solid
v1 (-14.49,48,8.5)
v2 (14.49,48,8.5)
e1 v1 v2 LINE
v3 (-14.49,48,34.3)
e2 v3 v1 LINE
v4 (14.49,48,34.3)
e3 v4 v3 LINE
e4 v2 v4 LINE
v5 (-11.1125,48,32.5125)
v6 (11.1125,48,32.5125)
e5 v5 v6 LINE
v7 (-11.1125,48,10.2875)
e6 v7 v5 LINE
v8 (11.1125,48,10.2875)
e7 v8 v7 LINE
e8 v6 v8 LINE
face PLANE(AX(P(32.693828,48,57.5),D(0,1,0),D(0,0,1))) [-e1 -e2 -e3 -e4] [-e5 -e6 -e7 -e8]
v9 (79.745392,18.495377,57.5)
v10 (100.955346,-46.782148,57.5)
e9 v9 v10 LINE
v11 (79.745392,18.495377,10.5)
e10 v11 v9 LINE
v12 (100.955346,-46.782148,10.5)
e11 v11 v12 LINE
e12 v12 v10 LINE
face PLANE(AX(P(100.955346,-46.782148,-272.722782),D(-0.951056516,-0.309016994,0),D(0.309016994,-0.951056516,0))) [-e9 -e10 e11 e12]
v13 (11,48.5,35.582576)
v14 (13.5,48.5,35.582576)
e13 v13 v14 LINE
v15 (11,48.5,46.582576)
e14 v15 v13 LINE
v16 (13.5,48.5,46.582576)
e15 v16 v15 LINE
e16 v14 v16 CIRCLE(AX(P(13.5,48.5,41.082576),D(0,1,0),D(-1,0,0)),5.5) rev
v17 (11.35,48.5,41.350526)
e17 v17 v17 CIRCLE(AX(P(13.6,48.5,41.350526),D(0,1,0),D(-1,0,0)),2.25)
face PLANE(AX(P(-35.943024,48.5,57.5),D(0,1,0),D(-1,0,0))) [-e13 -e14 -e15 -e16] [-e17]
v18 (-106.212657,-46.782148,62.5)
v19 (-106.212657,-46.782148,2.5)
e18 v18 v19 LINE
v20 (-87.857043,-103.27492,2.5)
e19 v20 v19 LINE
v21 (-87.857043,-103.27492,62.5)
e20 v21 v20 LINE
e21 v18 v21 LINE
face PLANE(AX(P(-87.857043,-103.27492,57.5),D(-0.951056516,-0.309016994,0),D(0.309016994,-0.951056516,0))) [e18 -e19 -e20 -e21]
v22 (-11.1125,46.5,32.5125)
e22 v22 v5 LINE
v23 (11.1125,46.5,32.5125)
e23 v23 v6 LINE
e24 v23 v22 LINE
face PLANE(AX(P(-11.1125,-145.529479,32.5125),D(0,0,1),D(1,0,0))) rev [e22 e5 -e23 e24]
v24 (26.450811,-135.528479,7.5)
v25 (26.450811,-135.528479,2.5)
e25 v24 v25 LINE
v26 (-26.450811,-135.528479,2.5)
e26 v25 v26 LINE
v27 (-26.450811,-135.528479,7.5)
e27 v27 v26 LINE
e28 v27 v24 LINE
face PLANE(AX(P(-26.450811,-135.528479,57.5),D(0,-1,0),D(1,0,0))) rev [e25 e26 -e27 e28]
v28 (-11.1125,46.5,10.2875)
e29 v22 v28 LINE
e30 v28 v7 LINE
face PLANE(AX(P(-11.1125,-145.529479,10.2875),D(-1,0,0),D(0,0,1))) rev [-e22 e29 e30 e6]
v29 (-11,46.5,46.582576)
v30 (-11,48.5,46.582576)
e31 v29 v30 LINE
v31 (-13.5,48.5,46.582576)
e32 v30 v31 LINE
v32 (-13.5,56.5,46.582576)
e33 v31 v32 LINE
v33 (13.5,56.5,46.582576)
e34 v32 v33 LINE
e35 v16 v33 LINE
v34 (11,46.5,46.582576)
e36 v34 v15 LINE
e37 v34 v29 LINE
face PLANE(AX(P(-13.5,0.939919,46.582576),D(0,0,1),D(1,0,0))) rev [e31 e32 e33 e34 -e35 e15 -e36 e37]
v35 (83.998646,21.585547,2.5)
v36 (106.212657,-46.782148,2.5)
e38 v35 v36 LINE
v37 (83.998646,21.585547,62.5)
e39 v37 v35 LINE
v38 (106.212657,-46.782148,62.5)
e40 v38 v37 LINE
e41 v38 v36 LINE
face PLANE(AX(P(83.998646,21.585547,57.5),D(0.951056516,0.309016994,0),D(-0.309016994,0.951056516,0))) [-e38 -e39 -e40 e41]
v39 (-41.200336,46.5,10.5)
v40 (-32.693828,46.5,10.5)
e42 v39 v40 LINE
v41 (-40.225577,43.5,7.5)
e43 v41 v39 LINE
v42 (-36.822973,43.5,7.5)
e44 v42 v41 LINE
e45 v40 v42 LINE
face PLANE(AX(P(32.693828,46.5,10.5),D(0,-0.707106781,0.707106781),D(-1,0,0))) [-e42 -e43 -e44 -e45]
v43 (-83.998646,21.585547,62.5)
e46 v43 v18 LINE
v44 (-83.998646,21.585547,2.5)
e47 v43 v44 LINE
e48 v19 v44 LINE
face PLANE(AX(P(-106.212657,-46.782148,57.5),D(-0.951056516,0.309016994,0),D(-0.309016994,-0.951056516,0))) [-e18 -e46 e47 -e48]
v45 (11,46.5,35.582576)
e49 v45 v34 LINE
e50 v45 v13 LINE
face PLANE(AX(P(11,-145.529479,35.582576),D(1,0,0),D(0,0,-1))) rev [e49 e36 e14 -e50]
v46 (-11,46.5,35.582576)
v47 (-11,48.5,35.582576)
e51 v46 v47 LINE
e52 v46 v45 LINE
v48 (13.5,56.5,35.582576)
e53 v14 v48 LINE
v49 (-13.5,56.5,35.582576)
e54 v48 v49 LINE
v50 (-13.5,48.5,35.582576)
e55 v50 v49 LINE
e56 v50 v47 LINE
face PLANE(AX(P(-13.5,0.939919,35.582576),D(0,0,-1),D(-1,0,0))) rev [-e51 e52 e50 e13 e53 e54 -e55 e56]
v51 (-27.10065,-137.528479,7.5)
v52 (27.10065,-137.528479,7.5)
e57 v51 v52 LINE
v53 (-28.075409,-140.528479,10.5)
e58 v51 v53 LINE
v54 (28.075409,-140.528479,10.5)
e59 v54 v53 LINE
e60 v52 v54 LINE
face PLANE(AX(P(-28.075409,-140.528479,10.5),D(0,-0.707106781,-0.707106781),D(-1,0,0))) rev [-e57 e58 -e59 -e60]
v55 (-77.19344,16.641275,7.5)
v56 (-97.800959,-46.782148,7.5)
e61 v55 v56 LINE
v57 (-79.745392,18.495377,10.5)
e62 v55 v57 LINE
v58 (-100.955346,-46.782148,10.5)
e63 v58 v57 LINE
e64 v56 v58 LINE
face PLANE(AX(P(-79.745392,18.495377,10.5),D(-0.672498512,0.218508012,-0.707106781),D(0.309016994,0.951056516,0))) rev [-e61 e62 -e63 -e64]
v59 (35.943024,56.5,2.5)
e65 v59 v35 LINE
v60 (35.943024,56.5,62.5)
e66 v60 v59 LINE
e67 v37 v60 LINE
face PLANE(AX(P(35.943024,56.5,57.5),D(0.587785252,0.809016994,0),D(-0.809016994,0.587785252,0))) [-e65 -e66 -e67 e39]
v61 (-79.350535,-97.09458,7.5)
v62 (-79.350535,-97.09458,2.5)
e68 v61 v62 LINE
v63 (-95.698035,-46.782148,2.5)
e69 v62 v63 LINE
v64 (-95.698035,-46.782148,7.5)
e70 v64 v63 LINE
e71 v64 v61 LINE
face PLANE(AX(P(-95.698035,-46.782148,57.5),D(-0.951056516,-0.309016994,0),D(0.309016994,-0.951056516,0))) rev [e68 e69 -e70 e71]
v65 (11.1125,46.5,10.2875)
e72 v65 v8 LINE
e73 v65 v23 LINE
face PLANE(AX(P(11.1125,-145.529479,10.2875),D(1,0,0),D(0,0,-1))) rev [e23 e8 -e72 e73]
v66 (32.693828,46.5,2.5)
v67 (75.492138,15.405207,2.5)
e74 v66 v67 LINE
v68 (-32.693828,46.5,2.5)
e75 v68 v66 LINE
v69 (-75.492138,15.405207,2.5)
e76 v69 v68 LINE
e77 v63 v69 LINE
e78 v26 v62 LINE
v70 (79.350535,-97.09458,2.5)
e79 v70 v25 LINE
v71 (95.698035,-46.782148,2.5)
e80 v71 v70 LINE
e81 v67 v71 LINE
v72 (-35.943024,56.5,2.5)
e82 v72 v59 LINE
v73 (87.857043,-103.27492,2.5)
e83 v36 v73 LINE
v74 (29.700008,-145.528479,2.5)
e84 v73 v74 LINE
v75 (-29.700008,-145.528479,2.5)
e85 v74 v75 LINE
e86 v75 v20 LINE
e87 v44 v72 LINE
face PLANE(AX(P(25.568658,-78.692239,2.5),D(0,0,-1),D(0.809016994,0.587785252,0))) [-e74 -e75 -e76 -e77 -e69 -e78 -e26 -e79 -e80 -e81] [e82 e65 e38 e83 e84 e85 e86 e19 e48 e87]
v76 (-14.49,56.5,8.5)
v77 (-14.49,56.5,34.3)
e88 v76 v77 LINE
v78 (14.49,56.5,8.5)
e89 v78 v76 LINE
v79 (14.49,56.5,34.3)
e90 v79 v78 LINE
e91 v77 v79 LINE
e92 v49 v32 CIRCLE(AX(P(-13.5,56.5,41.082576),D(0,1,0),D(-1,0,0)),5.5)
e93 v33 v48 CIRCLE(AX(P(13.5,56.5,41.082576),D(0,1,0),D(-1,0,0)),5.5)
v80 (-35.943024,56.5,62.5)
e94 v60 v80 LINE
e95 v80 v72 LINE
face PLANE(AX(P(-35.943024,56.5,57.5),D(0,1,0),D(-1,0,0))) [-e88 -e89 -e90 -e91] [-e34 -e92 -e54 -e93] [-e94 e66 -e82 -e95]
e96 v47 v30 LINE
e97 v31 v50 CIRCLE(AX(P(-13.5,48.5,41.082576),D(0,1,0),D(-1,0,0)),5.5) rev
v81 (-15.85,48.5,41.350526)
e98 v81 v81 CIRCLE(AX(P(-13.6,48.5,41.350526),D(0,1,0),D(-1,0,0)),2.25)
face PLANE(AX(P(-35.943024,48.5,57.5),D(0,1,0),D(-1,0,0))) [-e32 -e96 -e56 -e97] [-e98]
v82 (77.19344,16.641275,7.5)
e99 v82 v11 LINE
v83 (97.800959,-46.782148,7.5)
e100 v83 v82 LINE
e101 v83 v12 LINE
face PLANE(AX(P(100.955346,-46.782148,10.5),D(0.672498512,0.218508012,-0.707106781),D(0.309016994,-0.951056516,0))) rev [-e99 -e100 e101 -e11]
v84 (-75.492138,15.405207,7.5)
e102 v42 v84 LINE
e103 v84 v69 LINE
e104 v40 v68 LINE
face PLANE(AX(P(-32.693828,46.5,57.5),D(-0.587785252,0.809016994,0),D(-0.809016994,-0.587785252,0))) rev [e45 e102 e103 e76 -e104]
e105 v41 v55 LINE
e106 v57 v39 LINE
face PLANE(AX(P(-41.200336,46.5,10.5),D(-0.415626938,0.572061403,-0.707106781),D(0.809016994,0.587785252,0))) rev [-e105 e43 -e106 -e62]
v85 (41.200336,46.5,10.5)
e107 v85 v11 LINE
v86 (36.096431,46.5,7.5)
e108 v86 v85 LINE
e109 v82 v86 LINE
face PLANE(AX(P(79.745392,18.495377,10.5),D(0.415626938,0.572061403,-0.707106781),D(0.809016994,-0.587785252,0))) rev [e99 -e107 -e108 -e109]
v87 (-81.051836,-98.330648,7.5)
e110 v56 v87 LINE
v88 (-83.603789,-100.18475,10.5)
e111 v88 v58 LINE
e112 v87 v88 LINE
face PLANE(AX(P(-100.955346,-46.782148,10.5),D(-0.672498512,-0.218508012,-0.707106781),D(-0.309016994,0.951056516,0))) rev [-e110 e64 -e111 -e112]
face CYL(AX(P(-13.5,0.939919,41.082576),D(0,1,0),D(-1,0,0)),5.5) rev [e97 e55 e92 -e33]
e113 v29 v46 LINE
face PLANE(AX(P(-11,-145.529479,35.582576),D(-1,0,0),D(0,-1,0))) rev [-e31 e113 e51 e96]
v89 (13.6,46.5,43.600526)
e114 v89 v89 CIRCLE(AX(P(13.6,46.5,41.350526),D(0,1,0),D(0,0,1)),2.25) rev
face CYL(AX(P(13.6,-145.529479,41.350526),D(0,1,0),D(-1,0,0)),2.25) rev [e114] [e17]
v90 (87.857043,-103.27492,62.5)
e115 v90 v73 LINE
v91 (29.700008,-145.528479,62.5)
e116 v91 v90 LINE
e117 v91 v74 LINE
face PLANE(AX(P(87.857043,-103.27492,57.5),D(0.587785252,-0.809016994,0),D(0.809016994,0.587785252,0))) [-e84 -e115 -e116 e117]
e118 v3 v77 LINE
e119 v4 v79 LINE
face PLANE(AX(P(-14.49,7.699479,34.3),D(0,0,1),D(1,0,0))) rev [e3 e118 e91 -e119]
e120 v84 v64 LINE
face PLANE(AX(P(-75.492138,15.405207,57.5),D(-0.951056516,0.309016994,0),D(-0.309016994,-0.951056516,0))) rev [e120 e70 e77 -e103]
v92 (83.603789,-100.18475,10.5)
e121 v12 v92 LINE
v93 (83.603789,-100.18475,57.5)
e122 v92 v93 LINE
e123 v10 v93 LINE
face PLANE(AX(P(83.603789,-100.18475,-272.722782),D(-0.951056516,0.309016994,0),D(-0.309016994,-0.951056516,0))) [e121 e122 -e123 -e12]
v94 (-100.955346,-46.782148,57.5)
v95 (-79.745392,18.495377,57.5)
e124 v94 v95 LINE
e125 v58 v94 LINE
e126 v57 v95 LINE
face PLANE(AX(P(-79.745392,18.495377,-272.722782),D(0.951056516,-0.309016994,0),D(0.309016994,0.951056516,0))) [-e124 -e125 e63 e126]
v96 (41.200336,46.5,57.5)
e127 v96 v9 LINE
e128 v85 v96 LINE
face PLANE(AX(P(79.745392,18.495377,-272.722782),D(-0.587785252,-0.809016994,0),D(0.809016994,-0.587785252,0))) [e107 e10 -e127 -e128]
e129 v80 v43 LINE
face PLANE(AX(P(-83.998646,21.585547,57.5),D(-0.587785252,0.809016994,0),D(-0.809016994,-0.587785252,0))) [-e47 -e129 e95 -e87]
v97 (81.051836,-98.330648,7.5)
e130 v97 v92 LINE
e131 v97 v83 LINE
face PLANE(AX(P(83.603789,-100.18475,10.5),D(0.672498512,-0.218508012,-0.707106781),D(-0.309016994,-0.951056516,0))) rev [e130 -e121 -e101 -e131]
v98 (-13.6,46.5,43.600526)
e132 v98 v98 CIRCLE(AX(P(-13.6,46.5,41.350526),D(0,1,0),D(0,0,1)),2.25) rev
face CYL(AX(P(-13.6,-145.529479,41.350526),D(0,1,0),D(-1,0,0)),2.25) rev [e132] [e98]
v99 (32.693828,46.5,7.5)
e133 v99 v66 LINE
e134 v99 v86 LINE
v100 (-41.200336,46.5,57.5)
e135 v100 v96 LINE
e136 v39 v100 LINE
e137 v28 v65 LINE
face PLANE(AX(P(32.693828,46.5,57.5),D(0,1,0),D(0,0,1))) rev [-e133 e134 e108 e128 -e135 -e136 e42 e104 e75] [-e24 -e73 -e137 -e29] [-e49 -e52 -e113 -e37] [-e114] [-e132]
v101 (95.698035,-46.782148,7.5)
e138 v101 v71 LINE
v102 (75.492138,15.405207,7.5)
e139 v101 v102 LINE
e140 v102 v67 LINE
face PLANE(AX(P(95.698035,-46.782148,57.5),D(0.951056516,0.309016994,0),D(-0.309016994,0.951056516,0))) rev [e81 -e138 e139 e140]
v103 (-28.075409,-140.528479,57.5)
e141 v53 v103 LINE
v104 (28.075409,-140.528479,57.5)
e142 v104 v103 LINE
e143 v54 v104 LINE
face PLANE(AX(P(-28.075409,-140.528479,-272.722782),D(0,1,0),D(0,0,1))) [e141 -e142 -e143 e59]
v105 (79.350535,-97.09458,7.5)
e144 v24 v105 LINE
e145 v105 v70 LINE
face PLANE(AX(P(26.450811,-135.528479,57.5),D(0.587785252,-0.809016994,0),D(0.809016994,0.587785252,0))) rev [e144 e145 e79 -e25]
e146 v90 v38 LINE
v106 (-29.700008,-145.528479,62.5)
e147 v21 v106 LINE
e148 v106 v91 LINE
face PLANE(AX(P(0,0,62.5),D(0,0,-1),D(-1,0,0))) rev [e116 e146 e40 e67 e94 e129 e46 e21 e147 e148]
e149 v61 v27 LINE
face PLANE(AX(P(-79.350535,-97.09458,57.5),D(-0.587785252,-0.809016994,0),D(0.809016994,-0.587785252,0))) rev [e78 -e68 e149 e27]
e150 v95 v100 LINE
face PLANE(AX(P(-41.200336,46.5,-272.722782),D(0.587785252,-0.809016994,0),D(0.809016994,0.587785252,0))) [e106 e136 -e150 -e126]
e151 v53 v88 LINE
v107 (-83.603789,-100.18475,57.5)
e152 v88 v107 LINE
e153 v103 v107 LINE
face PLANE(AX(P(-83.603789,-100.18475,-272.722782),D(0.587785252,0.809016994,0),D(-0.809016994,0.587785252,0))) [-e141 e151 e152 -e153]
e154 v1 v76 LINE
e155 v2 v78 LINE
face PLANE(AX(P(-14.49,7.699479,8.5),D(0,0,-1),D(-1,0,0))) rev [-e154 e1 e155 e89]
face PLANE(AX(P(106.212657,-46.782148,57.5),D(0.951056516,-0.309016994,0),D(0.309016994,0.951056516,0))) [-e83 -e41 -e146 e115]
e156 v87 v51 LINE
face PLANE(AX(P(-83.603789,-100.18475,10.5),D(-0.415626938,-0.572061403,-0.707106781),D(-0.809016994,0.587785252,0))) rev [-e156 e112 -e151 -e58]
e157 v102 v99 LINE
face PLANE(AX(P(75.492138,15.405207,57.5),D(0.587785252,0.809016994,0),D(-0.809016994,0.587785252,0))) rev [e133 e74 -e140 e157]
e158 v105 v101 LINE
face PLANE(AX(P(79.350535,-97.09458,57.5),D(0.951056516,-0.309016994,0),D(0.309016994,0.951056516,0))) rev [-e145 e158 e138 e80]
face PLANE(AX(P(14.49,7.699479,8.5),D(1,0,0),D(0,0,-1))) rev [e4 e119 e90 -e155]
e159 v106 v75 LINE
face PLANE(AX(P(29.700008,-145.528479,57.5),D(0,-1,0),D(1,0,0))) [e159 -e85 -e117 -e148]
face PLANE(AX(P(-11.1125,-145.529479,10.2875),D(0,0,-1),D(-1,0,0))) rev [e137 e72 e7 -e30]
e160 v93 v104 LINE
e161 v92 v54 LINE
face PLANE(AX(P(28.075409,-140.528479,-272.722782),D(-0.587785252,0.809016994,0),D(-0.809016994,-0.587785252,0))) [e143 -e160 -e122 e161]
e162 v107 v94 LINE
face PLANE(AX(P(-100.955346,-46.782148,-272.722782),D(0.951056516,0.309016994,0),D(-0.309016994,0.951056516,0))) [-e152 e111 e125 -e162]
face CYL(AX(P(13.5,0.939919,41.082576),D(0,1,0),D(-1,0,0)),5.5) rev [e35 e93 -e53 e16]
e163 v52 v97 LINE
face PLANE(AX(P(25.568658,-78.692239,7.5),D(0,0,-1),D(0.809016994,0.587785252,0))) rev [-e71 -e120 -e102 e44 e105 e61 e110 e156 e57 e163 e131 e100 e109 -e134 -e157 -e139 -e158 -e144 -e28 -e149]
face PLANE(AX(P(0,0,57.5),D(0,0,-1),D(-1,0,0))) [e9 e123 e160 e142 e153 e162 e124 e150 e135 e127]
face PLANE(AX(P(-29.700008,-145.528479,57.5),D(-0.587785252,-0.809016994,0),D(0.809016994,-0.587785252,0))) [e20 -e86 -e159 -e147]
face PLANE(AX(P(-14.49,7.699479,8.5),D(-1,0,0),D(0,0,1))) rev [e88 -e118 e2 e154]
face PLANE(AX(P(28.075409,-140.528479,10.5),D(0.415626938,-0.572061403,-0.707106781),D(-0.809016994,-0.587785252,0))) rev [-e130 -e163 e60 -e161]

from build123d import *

# Parameters (mm, degrees)
BOSS_EXTRUDE1_DEPTH      = 32.5
SKETCH4_R                = 1.05
BOSS_EXTRUDE2_DEPTH      = 2.5
SKETCH5_R                = 1.05
BOSS_EXTRUDE3_DEPTH      = 3
CUT_EXTRUDE1_DEPTH       = 57.494113711
SKETCH13_W               = 30.122
SKETCH13_H               = 38
BOSS_EXTRUDE7_DEPTH      = 2.5
BOSS_EXTRUDE4_DEPTH      = 5
BOSS_EXTRUDE6_DEPTH      = 5
CUT_EXTRUDE2_DEPTH       = 88.339560135
SKETCH14_W               = 15
SKETCH14_H               = 5
CUT_EXTRUDE3_DEPTH       = 78.191649756
SKETCH15_W               = 30.122
SKETCH15_H               = 34.5
SKETCH15_R               = 2.495
BOSS_EXTRUDE8_DEPTH      = 3
SKETCH17_R               = 13.75
CUT_EXTRUDE4_DEPTH       = 82.57236537
CUT_EXTRUDE6_DEPTH       = 78.191649756
CUT_EXTRUDE6_DEPTH_BACK  = 78.191649756
SKETCH19_W               = 15
SKETCH19_H               = 3
SKETCH21_R               = 2.25
CUT_EXTRUDE8_DEPTH       = 1.5
SKETCH20_R               = 10
CUT_EXTRUDE7_DEPTH       = 80.23730682
CIRPATTERN2_COUNT        = 5
CHAMFER1_SIZE2           = 2
CHAMFER1_SIZE            = 1.154700538
SKETCH22_R               = 1.575
CUT_EXTRUDE9_DEPTH       = 170.45894052
SKETCH23_R               = 2.6
CUT_EXTRUDE10_DEPTH      = 3
CIRPATTERN3_COUNT        = 5
BOSS_EXTRUDE9_DEPTH      = 55
CUT_EXTRUDE11_DEPTH      = 187.975043137
CUT_EXTRUDE11_DEPTH_BACK = 187.975043137
BOSS_EXTRUDE10_DEPTH     = 5
CUT_EXTRUDE12_DEPTH      = 50
CHAMFER2_SIZE            = 3
SKETCH30_W               = 28.98
SKETCH30_H               = 25.8
CUT_EXTRUDE15_DEPTH      = 8.5
CUT_EXTRUDE16_REACH      = 231.436
SKETCH33_W               = 22.225
SKETCH33_H               = 22.225
CUT_EXTRUDE14_DEPTH      = 8
CUT_EXTRUDE17_REACH      = 231.857
SKETCH34_R               = 2.25
SKETCH34_W               = 22
SKETCH34_H               = 11


with BuildPart() as part:
    # Sketch2 → Boss-Extrude1 (new body)
    with BuildSketch(Plane(origin=(0, 0, 0), x_dir=(1, 0, 0), z_dir=(0, 1, 0))):
        Polygon((15.061, 0), (15.061, 32), (12.561, 32), (12.561, 2.5), (-12.561, 2.5), (-12.561, 32), (-15.061, 32), (-15.061, 0), align=None)
    extrude(amount=BOSS_EXTRUDE1_DEPTH)

    # Sketch4 → Boss-Extrude2 (add)
    # profile 1 of 2: a face of its own
    with BuildSketch(Plane.XZ):
        Polygon((-7.561, -6), (-7.561, 0), (-15.061, 0), (-15.061, -32), (-12.561, -32), (-12.561, -10), align=None)
        with Locations(Location((-10.2499, -4.95, 0), (0, 0, 270))):
            Circle(SKETCH4_R, mode=Mode.SUBTRACT)
    # profile 2 of 2: a face of its own
    with BuildSketch(Plane.XZ):
        Polygon((12.561, -10), (7.561, -6), (7.561, 0), (15.061, 0), (15.061, -32), (12.561, -32), align=None)
        with Locations(Location((10.2499, -4.95, 0), (0, 0, 270))):
            Circle(SKETCH4_R, mode=Mode.SUBTRACT)
    extrude(amount=BOSS_EXTRUDE2_DEPTH)

    # Sketch5 → Boss-Extrude3 (add)
    with BuildSketch(Plane(origin=(0, 32.5, 0), x_dir=(1, 0, 0), z_dir=(0, 1, 0))):
        Polygon((-15.061, 32), (-10.2499, 32), (-6.25, 26), (6.25, 26), (10.2499, 32), (15.061, 32), (15.061, 0), (-15.061, 0), align=None)
        with Locations(Location((-10.2499, 8.7, 0), (0, 0, 270))):
            Circle(SKETCH5_R, mode=Mode.SUBTRACT)
        with Locations(Location((10.2499, 8.7, 0), (0, 0, 270))):
            Circle(SKETCH5_R, mode=Mode.SUBTRACT)
    extrude(amount=BOSS_EXTRUDE3_DEPTH)

    # Sketch6 → Cut-Extrude1 (cut, through all)
    with BuildSketch(Plane.ZY.offset(15.061)):
        Polygon((-12.5, 35.5), (-32, 2.5), (-32, 35.5), align=None)
    extrude(amount=-CUT_EXTRUDE1_DEPTH, mode=Mode.SUBTRACT)

    # Sketch13 → Boss-Extrude7 (add)
    with BuildSketch(Plane.XY):
        with Locations((0, 16.5)):
            Rectangle(SKETCH13_W, SKETCH13_H)
    extrude(amount=BOSS_EXTRUDE7_DEPTH)

    # Sketch8 → Boss-Extrude4 (add)
    with BuildSketch(Plane.XY.offset(2.5)):
        Polygon((0, -43.5), (-43.59255168, 16.5), (43.59255168, 16.5), align=None)
    extrude(amount=BOSS_EXTRUDE4_DEPTH)

    # Sketch9 → Boss-Extrude6 (add)
    with BuildSketch(Plane.XY.offset(2.5)):
        Polygon((43.59255168, 16.5), (65.38882752, 46.5), (-65.38882752, 46.5), (-43.59255168, 16.5), align=None)
    extrude(amount=BOSS_EXTRUDE6_DEPTH)

    # Sketch10 → Cut-Extrude2 (cut, through all)
    with BuildSketch(Plane(origin=(0, 0, 2.5), x_dir=(-1, 0, 0), z_dir=(0, 0, -1))):
        Polygon((-65.38882752, 46.5), (-54.092982836, 30.9526036), (-32.69382752, 46.5), align=None)
        Polygon((54.092982836, 30.9526036), (65.38882752, 46.5), (32.69382752, 46.5), align=None)
    extrude(amount=-CUT_EXTRUDE2_DEPTH, mode=Mode.SUBTRACT)

    # Sketch14 → Cut-Extrude3 (cut, through all)
    with BuildSketch(Plane(origin=(0, 0, -2.5), x_dir=(-1, 0, 0), z_dir=(0, 0, -1))):
        Polygon((-7.561, -2.5), (7.561, -2.5), (7.561, 0), (12.561, 0), (12.561, 7.783674653), (-12.561, 7.783674653), (-12.561, 0), (-7.561, 0), align=None)
        with Locations((0, 38)):
            Rectangle(SKETCH14_W, SKETCH14_H)
    extrude(amount=-CUT_EXTRUDE3_DEPTH, mode=Mode.SUBTRACT)

    # Sketch15 → Boss-Extrude8 (add)
    with BuildSketch(Plane.XZ.offset(2.5)):
        with Locations((0, -14.75)):
            Rectangle(SKETCH15_W, SKETCH15_H)
        with Locations(Location((-10.2499, -4.95, 0), (0, 0, 270))):
            Circle(SKETCH15_R, mode=Mode.SUBTRACT)
        with Locations(Location((10.340989886, -4.95, 0), (0, 0, 270))):
            Circle(SKETCH15_R, mode=Mode.SUBTRACT)
    extrude(amount=BOSS_EXTRUDE8_DEPTH)

    # Sketch17 → Cut-Extrude4 (cut, through all)
    with BuildSketch(Plane.XZ.offset(5.5)):
        with Locations((0, -37.5)):
            Circle(SKETCH17_R)
    extrude(amount=-CUT_EXTRUDE4_DEPTH, mode=Mode.SUBTRACT)

    # Sketch19 → Cut-Extrude6 (cut, two sides: drawn at the far end of the back side and taken through both)
    with BuildSketch(Plane(origin=(0, 0, -2.5), x_dir=(-1, 0, 0), z_dir=(0, 0, -1)).offset(-CUT_EXTRUDE6_DEPTH_BACK)):
        with Locations((0, 34)):
            Rectangle(SKETCH19_W, SKETCH19_H)
    extrude(amount=CUT_EXTRUDE6_DEPTH + CUT_EXTRUDE6_DEPTH_BACK, mode=Mode.SUBTRACT)

    # Sketch21 → Cut-Extrude8 (cut)
    with BuildSketch(Plane(origin=(0, 35.5, 0), x_dir=(1, 0, 0), z_dir=(0, 1, 0))):
        with Locations(Location((-10.2499, 8.7, 0), (0, 0, 270))):
            Circle(SKETCH21_R)
        with Locations(Location((10.2499, 8.7, 0), (0, 0, 270))):
            Circle(SKETCH21_R)
    extrude(amount=-CUT_EXTRUDE8_DEPTH, mode=Mode.SUBTRACT)

    # Sketch20 → Cut-Extrude7 (cut, through all)
    with BuildSketch(Plane(origin=(0, 0, 2.5), x_dir=(-1, 0, 0), z_dir=(0, 0, -1))):
        with Locations((0, -43.5)):
            Circle(SKETCH20_R)
    extrude(amount=-CUT_EXTRUDE7_DEPTH, mode=Mode.SUBTRACT)


with BuildPart() as cirpattern2_1:
    # CirPattern2: pattern copy
    add(part.part.rotate(Axis((0, -43.5, 0), (0, 0, 1)), 1 * 360 / CIRPATTERN2_COUNT))


with BuildPart() as cirpattern2_2:
    # CirPattern2: pattern copy
    add(part.part.rotate(Axis((0, -43.5, 0), (0, 0, 1)), 2 * 360 / CIRPATTERN2_COUNT))


with BuildPart() as cirpattern2_3:
    # CirPattern2: pattern copy
    add(part.part.rotate(Axis((0, -43.5, 0), (0, 0, 1)), 3 * 360 / CIRPATTERN2_COUNT))


with BuildPart() as cirpattern2_4:
    # CirPattern2: pattern copy
    add(part.part.rotate(Axis((0, -43.5, 0), (0, 0, 1)), 4 * 360 / CIRPATTERN2_COUNT))


with BuildPart() as cirpattern2_3_1:
    add(cirpattern2_3.part)

    # Combine1: union CirPattern2_2, CirPattern2_1, part, CirPattern2_4
    add(cirpattern2_2.part)
    add(cirpattern2_1.part)
    add(part.part)
    add(cirpattern2_4.part)

    # Chamfer1
    chamfer1_edges = [cirpattern2_3_1.edges().sort_by_distance(p)[0] for p in [
        (52.900672706, -116.311529494, 7.5),
        (0, -135.528479151, 7.5),
        (87.524284782, -71.938364024, 7.5),
        (24.099195344, -76.669696769, 7.5),
        (18.716949415, -82.125212305, 7.5),
        (17.429138494, -84.605946679, 7.5),
        (17.694160593, -89.223972346, 7.5),
        (30.143787645, -84.989364329, 7.5),
        (38.018285526, -74.457631238, 7.5),
        (33.708178455, -72.778531832, 7.5),
        (30.950904404, -73.23672372, 7.5),
        (40.955192726, -112.629748942, 7.5),
        (49.373961193, -111.457427527, 7.5),
        (53.090447641, -103.812970158, 7.5),
        (44.671679174, -104.985291572, 7.5),
        (-5.877852523, -51.590169944, 7.5),
        (-52.900672706, -116.311529494, 7.5),
        (-33.708178455, -72.778531832, 7.5),
        (-30.950904404, -73.23672372, 7.5),
        (-24.099195344, -76.669696769, 7.5),
        (-18.716949415, -82.125212305, 7.5),
        (-17.429138494, -84.605946679, 7.5),
        (-17.694160593, -89.223972346, 7.5),
        (-30.143787645, -84.989364329, 7.5),
        (-38.018285526, -74.457631238, 7.5),
        (-44.671679174, -104.985291572, 7.5),
        (-40.955192726, -112.629748942, 7.5),
        (-49.373961193, -111.457427527, 7.5),
        (-53.090447641, -103.812970158, 7.5),
        (54.092982836, 30.9526036, 7.5),
        (-54.092982836, 30.9526036, 7.5),
        (-87.524284782, -71.938364024, 7.5),
        (-38.261938478, -20.489181134, 7.5),
        (-37.845660319, -23.253093668, 7.5),
        (-38.993317168, -30.830303231, 7.5),
        (-42.518615308, -37.634970307, 7.5),
        (-44.479978439, -39.626340355, 7.5),
        (-48.953878175, -40.801337773, 7.5),
        (-48.773672959, -27.652472998, 7.5),
        (-41.190753242, -16.90889597, 7.5),
        (-72.280295238, -20.014708428, 7.5),
        (-78.402148761, -25.911564322, 7.5),
        (-79.888747369, -17.542572473, 7.5),
        (-73.766893846, -11.645716578, 7.5),
        (10.061, 0, 7.5),
        (7.561, -1.25, 7.5),
        (0, -2.5, 7.5),
        (-7.561, -1.25, 7.5),
        (-10.061, 0, 7.5),
        (-12.561, 3.891837327, 7.5),
        (0, 7.783674653, 7.5),
        (12.561, 3.891837327, 7.5),
        (0, 32.5, 7.5),
        (-7.5, 36.5, 7.5),
        (0, 40.5, 7.5),
        (7.5, 36.5, 7.5),
        (44.479978439, -39.626340355, 7.5),
        (42.518615308, -37.634970307, 7.5),
        (38.993317168, -30.830303231, 7.5),
        (37.845660319, -23.253093668, 7.5),
        (38.261938478, -20.489181134, 7.5),
        (41.190753242, -16.90889597, 7.5),
        (48.773672959, -27.652472998, 7.5),
        (48.953878175, -40.801337773, 7.5),
        (72.280295238, -20.014708428, 7.5),
        (73.766893846, -11.645716578, 7.5),
        (79.888747369, -17.542572473, 7.5),
        (78.402148761, -25.911564322, 7.5),
        (-85.595086467, -15.688470506, 7.5),
        (0, 46.5, 7.5),
        (85.595086467, -15.688470506, 7.5),
    ]]
    chamfer(chamfer1_edges, length=CHAMFER1_SIZE, length2=CHAMFER1_SIZE2)

    # Sketch22 → Cut-Extrude9 (cut, through all)
    with BuildSketch(Plane(origin=(0, 0, 2.5), x_dir=(-1, 0, 0), z_dir=(0, 0, -1))):
        with Locations((0, -123.5)):
            Circle(SKETCH22_R)
    cut_extrude9 = extrude(amount=-CUT_EXTRUDE9_DEPTH, mode=Mode.SUBTRACT)

    # Sketch23 → Cut-Extrude10 (cut)
    with BuildSketch(Plane(origin=(0, 0, 2.5), x_dir=(-1, 0, 0), z_dir=(0, 0, -1))):
        with Locations((0, -123.5)):
            Circle(SKETCH23_R)
    cut_extrude10 = extrude(amount=-CUT_EXTRUDE10_DEPTH, mode=Mode.SUBTRACT)

    # CirPattern3: Cut-Extrude9, Cut-Extrude10 ×5 about axis
    cirpattern3_axis = Axis((0, -43.5, 0), (0, 0, 1))
    add([cut_extrude9.rotate(cirpattern3_axis, i * 360 / CIRPATTERN3_COUNT) for i in range(1, CIRPATTERN3_COUNT)], mode=Mode.SUBTRACT)
    add([cut_extrude10.rotate(cirpattern3_axis, i * 360 / CIRPATTERN3_COUNT) for i in range(1, CIRPATTERN3_COUNT)], mode=Mode.SUBTRACT)

    # Sketch24 → Boss-Extrude9 (add)
    with BuildSketch(Plane(origin=(0, 0, 2.5), x_dir=(-1, 0, 0), z_dir=(0, 0, -1))):
        Polygon((87.857042865, -103.274919724), (106.212657024, -46.782148212), (83.998646235, 21.585547087), (35.943024483, 56.5), (-35.943024483, 56.5), (-83.998646235, 21.585547087), (-106.212657024, -46.782148212), (-87.857042865, -103.274919724), (-29.700007593, -145.528479151), (29.700007593, -145.528479151), align=None)
        Polygon((-32.69382752, 46.5), (32.69382752, 46.5), (75.492138152, 15.4052072), (95.698034782, -46.782148212), (79.350534782, -97.094579836), (26.450810631, -135.528479151), (-26.450810631, -135.528479151), (-79.350534782, -97.094579836), (-95.698034782, -46.782148212), (-75.492138152, 15.4052072), align=None, mode=Mode.SUBTRACT)
    extrude(amount=-BOSS_EXTRUDE9_DEPTH)

    # Sketch25 → Cut-Extrude11 (cut, two sides: drawn at the far end of the back side and taken through both)
    with BuildSketch(Plane.XY.offset(7.5).offset(-CUT_EXTRUDE11_DEPTH_BACK)):
        Polygon((-32.69382752, 46.5), (32.69382752, 46.5), (75.492138152, 15.4052072), (95.698034782, -46.782148212), (79.350534782, -97.094579836), (26.450810631, -135.528479151), (-26.450810631, -135.528479151), (-79.350534782, -97.094579836), (-95.698034782, -46.782148212), (-75.492138152, 15.4052072), align=None)
    extrude(amount=CUT_EXTRUDE11_DEPTH + CUT_EXTRUDE11_DEPTH_BACK, mode=Mode.SUBTRACT)

    # Sketch26 → Boss-Extrude10 (add)
    with BuildSketch(Plane.XY.offset(57.5)):
        Polygon((-83.998646235, 21.585547087), (-35.943024483, 56.5), (35.943024483, 56.5), (83.998646235, 21.585547087), (106.212657024, -46.782148212), (87.857042865, -103.274919724), (29.700007593, -145.528479151), (-29.700007593, -145.528479151), (-87.857042865, -103.274919724), (-106.212657024, -46.782148212), align=None)
    extrude(amount=BOSS_EXTRUDE10_DEPTH)

    # Sketch29 → Cut-Extrude12 (cut)
    with BuildSketch(Plane(origin=(0, 0, 57.5), x_dir=(-1, 0, 0), z_dir=(0, 0, -1))):
        Polygon((-41.200335604, 46.5), (41.200335604, 46.5), (79.745392193, 18.495377143), (100.955345903, -46.782148212), (83.603788823, -100.18474978), (28.075409112, -140.528479151), (-28.075409112, -140.528479151), (-83.603788823, -100.18474978), (-100.955345903, -46.782148212), (-79.745392193, 18.495377143), align=None)
    extrude(amount=CUT_EXTRUDE12_DEPTH, mode=Mode.SUBTRACT)

    # Chamfer2
    chamfer2_edges = [cirpattern2_3_1.edges().sort_by_distance(p)[0] for p in [
        (-36.947081562, 46.5, 7.5),
        (60.472863899, 32.497688572, 7.5),
        (90.350369048, -14.143385534, 7.5),
        (92.279567363, -73.483448996, 7.5),
        (55.839598968, -120.356614466, 7.5),
        (0, -140.528479151, 7.5),
        (-55.839598968, -120.356614466, 7.5),
        (-92.279567363, -73.483448996, 7.5),
        (-90.350369048, -14.143385534, 7.5),
        (-60.472863899, 32.497688572, 7.5),
    ]]
    chamfer(chamfer2_edges, length=CHAMFER2_SIZE)

    # Sketch30 → Cut-Extrude15 (cut)
    with BuildSketch(Plane(origin=(0, 56.5, 0), x_dir=(1, 0, 0), z_dir=(0, 1, 0))):
        with Locations((0, -21.4)):
            Rectangle(SKETCH30_W, SKETCH30_H)
    extrude(amount=-CUT_EXTRUDE15_DEPTH, mode=Mode.SUBTRACT)

    # Sketch33 → Cut-Extrude16 (cut, up to next)
    with BuildSketch(Plane(origin=(0, 48, 0), x_dir=(1, 0, 0), z_dir=(0, 1, 0)), mode=Mode.PRIVATE) as cut_extrude16_sk1:
        with Locations((0, -21.4)):
            Rectangle(SKETCH33_W, SKETCH33_H)
    cut_extrude16_tool1 = extrude(cut_extrude16_sk1.sketch, amount=-CUT_EXTRUDE16_REACH, mode=Mode.PRIVATE) & cirpattern2_3_1.part
    add(cut_extrude16_tool1.solids().sort_by_distance((0, 48, 21.4))[0], mode=Mode.SUBTRACT)

    # Sketch32 → Cut-Extrude14 (cut)
    with BuildSketch(Plane(origin=(0, 56.5, 0), x_dir=(1, 0, 0), z_dir=(0, 1, 0))):
        with BuildLine():
            Line((-13.5, -35.582576287), (13.5, -35.582576287))
            ThreePointArc((13.5, -35.582576287), (19, -41.082576287), (13.5, -46.582576287))
            Line((13.5, -46.582576287), (-13.5, -46.582576287))
            ThreePointArc((-13.5, -46.582576287), (-19, -41.082576287), (-13.5, -35.582576287))
        make_face()
    extrude(amount=-CUT_EXTRUDE14_DEPTH, mode=Mode.SUBTRACT)

    # Sketch34 → Cut-Extrude17 (cut, up to next)
    with BuildSketch(Plane(origin=(0, 48.5, 0), x_dir=(1, 0, 0), z_dir=(0, 1, 0)), mode=Mode.PRIVATE) as cut_extrude17_sk1:
        with Locations(Location((-13.6, -41.350525767, 0), (0, 0, 180))):
            Circle(SKETCH34_R)
    cut_extrude17_tool1 = extrude(cut_extrude17_sk1.sketch, amount=-CUT_EXTRUDE17_REACH, mode=Mode.PRIVATE) & cirpattern2_3_1.part
    # Sketch34 → Cut-Extrude17 (cut, up to next)
    with BuildSketch(Plane(origin=(0, 48.5, 0), x_dir=(1, 0, 0), z_dir=(0, 1, 0)), mode=Mode.PRIVATE) as cut_extrude17_sk2:
        with Locations(Location((13.6, -41.350525767, 0), (0, 0, 180))):
            Circle(SKETCH34_R)
    cut_extrude17_tool2 = extrude(cut_extrude17_sk2.sketch, amount=-CUT_EXTRUDE17_REACH, mode=Mode.PRIVATE) & cirpattern2_3_1.part
    # Sketch34 → Cut-Extrude17 (cut, up to next)
    with BuildSketch(Plane(origin=(0, 48.5, 0), x_dir=(1, 0, 0), z_dir=(0, 1, 0)), mode=Mode.PRIVATE) as cut_extrude17_sk3:
        with Locations((0, -41.082576287)):
            Rectangle(SKETCH34_W, SKETCH34_H)
    cut_extrude17_tool3 = extrude(cut_extrude17_sk3.sketch, amount=-CUT_EXTRUDE17_REACH, mode=Mode.PRIVATE) & cirpattern2_3_1.part
    add(cut_extrude17_tool1.solids().sort_by_distance((-13.6, 48.5, 41.350526))[0], mode=Mode.SUBTRACT)
    add(cut_extrude17_tool2.solids().sort_by_distance((13.6, 48.5, 41.350526))[0], mode=Mode.SUBTRACT)
    add(cut_extrude17_tool3.solids().sort_by_distance((0, 48.5, 41.082576))[0], mode=Mode.SUBTRACT)


solid = cirpattern2_3_1.part
